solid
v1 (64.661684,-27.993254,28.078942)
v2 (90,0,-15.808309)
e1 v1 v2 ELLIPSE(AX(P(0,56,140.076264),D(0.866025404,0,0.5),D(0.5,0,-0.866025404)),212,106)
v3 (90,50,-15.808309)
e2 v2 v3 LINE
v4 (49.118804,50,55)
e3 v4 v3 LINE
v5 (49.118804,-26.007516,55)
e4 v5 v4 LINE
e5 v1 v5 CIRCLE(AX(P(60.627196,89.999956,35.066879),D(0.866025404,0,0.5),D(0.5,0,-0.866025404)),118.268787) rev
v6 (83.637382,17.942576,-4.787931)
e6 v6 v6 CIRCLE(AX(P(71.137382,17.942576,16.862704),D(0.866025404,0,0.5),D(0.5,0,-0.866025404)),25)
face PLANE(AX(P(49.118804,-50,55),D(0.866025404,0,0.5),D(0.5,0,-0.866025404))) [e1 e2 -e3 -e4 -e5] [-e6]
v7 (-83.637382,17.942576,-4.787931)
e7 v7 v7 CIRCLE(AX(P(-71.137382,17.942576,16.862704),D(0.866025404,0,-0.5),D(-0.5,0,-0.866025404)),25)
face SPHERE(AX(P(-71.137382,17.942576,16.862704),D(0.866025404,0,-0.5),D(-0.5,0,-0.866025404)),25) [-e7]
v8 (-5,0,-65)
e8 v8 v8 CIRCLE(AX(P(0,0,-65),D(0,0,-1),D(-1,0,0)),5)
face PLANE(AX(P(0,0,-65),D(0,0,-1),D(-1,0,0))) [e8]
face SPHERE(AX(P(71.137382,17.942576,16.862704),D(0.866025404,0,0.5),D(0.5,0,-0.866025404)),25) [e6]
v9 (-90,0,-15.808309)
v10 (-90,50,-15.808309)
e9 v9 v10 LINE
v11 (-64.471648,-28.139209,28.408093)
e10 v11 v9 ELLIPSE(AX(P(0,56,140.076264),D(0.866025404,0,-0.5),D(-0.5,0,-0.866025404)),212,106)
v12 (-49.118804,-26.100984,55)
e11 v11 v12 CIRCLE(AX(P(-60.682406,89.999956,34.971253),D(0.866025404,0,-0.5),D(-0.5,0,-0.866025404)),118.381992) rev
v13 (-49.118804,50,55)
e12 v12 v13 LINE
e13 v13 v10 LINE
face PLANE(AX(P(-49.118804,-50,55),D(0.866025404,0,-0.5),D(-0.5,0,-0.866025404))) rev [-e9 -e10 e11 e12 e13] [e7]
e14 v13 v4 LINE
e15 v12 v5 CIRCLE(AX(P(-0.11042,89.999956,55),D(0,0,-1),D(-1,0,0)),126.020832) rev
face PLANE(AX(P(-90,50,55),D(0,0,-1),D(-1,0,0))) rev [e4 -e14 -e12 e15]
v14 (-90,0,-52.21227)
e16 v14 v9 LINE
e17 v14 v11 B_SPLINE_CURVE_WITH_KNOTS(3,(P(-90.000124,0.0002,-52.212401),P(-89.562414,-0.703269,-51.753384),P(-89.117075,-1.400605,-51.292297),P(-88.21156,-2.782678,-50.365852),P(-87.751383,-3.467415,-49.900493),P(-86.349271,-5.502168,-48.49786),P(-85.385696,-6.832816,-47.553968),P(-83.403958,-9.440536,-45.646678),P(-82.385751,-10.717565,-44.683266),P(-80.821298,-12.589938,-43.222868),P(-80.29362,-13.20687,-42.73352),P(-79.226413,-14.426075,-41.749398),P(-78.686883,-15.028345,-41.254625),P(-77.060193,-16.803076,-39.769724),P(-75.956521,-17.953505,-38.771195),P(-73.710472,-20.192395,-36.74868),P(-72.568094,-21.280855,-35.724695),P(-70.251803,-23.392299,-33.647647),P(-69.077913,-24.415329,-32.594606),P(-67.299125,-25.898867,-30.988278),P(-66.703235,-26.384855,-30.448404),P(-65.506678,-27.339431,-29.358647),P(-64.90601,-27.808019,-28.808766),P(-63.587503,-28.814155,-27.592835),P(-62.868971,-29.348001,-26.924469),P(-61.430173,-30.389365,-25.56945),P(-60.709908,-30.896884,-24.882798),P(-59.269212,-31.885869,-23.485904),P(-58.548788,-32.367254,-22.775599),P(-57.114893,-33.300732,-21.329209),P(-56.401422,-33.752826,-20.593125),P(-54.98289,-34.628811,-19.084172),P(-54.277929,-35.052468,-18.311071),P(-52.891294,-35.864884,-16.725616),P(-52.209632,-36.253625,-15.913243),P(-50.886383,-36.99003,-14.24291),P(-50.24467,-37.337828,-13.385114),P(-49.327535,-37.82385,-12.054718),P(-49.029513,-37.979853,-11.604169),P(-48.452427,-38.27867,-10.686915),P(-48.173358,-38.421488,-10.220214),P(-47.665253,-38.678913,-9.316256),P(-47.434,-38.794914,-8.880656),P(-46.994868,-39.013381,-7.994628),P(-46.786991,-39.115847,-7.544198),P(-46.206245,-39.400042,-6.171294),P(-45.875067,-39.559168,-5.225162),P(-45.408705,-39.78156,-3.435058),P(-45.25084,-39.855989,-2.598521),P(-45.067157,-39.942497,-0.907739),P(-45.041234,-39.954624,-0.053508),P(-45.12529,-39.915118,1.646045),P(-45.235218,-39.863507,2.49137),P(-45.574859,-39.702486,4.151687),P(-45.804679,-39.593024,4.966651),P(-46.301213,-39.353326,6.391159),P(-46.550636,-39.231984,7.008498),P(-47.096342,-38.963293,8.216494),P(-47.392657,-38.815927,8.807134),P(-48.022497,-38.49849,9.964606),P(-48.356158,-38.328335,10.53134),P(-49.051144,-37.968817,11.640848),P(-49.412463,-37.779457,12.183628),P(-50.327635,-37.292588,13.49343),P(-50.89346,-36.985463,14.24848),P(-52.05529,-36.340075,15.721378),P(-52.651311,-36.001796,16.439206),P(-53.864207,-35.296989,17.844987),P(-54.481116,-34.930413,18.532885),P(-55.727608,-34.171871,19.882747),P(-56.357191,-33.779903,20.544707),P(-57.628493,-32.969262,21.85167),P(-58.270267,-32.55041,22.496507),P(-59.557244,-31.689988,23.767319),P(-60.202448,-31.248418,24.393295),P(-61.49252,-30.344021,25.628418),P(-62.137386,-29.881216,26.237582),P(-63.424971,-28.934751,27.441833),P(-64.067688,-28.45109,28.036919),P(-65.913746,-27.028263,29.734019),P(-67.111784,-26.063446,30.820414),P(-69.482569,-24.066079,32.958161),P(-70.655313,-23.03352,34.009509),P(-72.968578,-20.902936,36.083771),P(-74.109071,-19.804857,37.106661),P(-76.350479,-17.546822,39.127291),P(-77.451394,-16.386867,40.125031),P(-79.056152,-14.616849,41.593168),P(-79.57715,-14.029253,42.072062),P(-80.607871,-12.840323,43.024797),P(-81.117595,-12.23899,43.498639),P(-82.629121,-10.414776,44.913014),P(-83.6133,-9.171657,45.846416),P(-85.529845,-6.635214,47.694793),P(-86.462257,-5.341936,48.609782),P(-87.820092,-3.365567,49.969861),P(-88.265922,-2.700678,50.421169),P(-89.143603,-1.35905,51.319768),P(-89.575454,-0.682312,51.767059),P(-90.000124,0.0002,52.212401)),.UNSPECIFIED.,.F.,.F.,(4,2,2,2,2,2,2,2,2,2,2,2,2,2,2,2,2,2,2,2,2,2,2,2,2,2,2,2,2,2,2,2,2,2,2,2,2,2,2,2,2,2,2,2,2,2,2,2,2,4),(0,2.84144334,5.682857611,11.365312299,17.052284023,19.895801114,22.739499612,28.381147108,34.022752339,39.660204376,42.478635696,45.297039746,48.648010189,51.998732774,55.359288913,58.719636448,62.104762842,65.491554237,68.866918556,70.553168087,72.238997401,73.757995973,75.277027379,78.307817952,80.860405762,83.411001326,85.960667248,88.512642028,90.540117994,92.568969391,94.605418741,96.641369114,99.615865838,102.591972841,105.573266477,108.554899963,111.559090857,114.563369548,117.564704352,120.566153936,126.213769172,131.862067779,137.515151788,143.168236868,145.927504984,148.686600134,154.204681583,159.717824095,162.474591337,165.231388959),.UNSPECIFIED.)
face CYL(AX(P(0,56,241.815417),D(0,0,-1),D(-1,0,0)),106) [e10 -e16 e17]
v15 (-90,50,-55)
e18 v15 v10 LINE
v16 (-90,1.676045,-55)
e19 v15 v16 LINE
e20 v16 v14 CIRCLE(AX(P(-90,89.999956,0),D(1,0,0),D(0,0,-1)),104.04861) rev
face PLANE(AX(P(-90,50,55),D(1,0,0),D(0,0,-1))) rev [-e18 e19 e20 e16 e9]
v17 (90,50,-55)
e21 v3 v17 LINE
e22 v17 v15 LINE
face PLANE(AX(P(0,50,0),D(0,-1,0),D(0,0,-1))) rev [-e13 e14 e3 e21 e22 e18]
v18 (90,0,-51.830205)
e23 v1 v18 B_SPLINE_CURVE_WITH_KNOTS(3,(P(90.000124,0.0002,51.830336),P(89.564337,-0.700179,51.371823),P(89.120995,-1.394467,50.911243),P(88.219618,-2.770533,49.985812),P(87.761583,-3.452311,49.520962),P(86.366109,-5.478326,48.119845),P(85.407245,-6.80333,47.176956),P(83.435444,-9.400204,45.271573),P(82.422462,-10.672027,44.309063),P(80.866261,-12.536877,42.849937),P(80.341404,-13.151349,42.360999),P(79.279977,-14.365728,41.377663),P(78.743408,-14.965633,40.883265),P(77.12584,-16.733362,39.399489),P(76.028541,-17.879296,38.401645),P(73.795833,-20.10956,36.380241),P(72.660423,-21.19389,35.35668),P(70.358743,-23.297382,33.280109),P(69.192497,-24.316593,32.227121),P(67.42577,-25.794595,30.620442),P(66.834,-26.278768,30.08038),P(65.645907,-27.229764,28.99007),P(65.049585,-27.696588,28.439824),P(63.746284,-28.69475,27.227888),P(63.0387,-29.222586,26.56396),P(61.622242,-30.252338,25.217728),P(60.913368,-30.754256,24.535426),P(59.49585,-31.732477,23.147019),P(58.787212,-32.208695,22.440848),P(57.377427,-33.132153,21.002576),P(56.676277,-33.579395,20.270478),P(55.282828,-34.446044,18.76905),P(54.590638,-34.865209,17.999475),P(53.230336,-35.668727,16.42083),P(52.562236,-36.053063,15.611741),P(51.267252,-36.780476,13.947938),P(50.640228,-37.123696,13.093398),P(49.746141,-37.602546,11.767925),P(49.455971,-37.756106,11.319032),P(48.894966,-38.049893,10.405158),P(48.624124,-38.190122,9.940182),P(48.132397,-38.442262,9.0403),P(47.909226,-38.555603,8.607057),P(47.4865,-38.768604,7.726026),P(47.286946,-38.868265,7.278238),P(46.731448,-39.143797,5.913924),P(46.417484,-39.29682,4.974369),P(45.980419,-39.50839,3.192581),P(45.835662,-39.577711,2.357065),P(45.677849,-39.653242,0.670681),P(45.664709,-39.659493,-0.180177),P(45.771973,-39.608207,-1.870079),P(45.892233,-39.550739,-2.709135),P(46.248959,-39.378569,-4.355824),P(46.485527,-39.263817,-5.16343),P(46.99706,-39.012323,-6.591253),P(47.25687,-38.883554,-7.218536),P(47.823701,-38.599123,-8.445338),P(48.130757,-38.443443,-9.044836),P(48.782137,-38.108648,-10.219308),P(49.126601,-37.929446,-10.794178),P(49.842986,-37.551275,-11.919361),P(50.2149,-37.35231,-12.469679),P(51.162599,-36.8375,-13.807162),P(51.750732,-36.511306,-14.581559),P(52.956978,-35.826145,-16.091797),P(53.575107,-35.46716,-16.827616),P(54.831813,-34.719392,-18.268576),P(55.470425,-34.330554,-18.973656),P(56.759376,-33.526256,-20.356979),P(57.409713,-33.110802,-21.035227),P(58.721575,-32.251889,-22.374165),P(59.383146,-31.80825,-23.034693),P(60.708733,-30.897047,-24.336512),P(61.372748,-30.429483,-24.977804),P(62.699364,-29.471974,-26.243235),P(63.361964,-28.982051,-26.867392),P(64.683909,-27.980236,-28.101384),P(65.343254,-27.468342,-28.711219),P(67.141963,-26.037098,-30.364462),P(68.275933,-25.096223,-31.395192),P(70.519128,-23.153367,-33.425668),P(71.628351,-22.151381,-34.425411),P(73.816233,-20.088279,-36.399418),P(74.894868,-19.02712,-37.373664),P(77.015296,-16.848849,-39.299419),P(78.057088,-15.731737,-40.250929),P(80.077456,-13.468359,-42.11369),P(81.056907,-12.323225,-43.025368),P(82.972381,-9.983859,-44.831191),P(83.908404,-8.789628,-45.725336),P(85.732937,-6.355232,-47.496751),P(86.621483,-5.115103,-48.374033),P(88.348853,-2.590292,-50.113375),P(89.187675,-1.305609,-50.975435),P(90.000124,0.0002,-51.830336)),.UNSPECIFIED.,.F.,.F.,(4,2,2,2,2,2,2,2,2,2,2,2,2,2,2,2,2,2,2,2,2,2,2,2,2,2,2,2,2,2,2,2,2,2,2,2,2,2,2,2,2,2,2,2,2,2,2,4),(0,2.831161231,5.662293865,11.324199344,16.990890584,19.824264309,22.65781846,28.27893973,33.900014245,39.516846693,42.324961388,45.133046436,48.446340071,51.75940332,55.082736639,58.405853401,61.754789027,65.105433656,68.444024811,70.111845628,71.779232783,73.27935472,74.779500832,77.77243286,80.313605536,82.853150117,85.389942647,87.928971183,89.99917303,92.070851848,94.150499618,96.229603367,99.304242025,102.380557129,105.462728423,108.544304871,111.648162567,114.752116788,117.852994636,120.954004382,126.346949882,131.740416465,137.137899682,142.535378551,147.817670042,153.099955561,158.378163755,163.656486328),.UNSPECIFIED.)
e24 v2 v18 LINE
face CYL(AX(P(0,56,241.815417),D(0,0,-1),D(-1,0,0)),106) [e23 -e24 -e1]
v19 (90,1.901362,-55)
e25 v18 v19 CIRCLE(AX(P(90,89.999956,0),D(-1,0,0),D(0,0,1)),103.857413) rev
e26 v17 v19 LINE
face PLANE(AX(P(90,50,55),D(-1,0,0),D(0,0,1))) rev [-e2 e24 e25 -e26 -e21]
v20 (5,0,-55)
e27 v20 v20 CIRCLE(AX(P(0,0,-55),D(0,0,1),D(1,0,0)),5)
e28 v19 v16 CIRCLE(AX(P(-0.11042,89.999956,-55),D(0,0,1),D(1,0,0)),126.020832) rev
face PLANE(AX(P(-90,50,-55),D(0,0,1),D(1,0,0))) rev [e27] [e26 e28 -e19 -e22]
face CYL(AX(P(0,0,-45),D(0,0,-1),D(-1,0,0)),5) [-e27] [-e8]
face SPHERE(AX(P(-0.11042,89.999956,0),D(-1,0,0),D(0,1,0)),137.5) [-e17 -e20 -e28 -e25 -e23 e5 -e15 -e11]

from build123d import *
from build123d.topology import SkipClean

# Parameters (mm, degrees)
SKETCH1_W                = 180
SKETCH1_H                = 110
BOSS_EXTRUDE1_DEPTH      = 50
BOSS_EXTRUDE2_DEPTH      = 110
CUT_EXTRUDE1_DEPTH       = 146.344418537
BOSS_EXTRUDE5_DEPTH      = 10
BOSS_EXTRUDE5_DEPTH_BACK = 10
SKETCH5_R                = 5


with BuildPart() as part:
    # Sketch1 → Boss-Extrude1 (new body)
    with BuildSketch(Plane(origin=(0, 0, 0), x_dir=(1, 0, 0), z_dir=(0, 1, 0))):
        Rectangle(SKETCH1_W, SKETCH1_H)
    extrude(amount=BOSS_EXTRUDE1_DEPTH)

    # Sketch2 → Boss-Extrude2 (add)
    with BuildSketch(Plane(origin=(-35, 0, -55), x_dir=(1, 0, 0), z_dir=(0, 0, 1))):
        with BuildLine():
            Line((-55, 0), (125, 0))
            ThreePointArc((125, 0), (35, -50), (-55, 0))
        make_face()
    extrude(amount=BOSS_EXTRUDE2_DEPTH)

    # Sketch3 → Cut-Extrude1 (cut, through all)
    with BuildSketch(Plane(origin=(0, 50, 0), x_dir=(1, 0, 0), z_dir=(0, 1, 0))):
        Polygon((-49.118803686, -55), (-90, 15.808309091), (-90, -55), align=None)
    cut_extrude1 = extrude(amount=-CUT_EXTRUDE1_DEPTH, mode=Mode.SUBTRACT)

    # Mirror1: Cut-Extrude1 across plane
    add(cut_extrude1.mirror(Plane(origin=(0, 0, 0), x_dir=(0, 0, 1), z_dir=(1, 0, 0))), mode=Mode.SUBTRACT)

    # Sketch5 → Boss-Extrude5 (add, two sides: drawn at the far end of the back side and taken through both)
    with BuildSketch(Plane(origin=(0, 0, -55), x_dir=(-1, 0, 0), z_dir=(0, 0, -1)).offset(-BOSS_EXTRUDE5_DEPTH_BACK)):
        Circle(SKETCH5_R)
    extrude(amount=BOSS_EXTRUDE5_DEPTH + BOSS_EXTRUDE5_DEPTH_BACK)

    # Sketch4 → Revolve1 (revolve)
    with BuildSketch(Plane(origin=(-60.654801368, 0, 35.019065898), x_dir=(0.49999999999999495, 0, 0.8660254037844417), z_dir=(-0.8660254037844417, 0, 0.49999999999999495))):
        with BuildLine():
            ThreePointArc((-20.965161058, 42.942576489), (4.034838942, 17.942576489), (-20.965161058, -7.057423511))
            Line((-20.965161058, -7.057423511), (-20.965161058, 42.942576489))
        make_face()
    revolve1 = revolve(axis=Axis((-71.137381897, 42.942576489, 16.862703827), (0, -1, 0)))

    # Mirror2: Revolve1 across plane
    add(revolve1.mirror(Plane(origin=(0, 0, 0), x_dir=(0, 0, 1), z_dir=(1, 0, 0))))


with BuildPart() as body_2:
    # Sketch6 → Revolve2 (revolve)
    with SkipClean():  # the faces are left unmerged after this step: merging them gives an invalid solid
        with BuildSketch(Plane.XY):
            with BuildLine():
                ThreePointArc((137.389580355, 89.999956455), (-0.110419645, 227.499956455), (-137.610419645, 89.999956455))
                Line((-137.610419645, 89.999956455), (137.389580355, 89.999956455))
            make_face()
            with BuildLine():
                Line((137.389580355, 89.999956455), (-137.610419645, 89.999956455))
                ThreePointArc((-137.610419645, 89.999956455), (-0.110419645, -47.500043545), (137.389580355, 89.999956455))
            make_face()
        revolve(axis=Axis((-137.610419645, 89.999956455, 0), (1, 0, 0)))
    add(body_2.part.scale(1), mode=Mode.REPLACE)  # the faces are merged on a copy

    # Intersect1: read off the stored shape, not the designer's step
    # Intersect1: intersect part
    add(part.part, mode=Mode.INTERSECT)


solid = body_2.part
